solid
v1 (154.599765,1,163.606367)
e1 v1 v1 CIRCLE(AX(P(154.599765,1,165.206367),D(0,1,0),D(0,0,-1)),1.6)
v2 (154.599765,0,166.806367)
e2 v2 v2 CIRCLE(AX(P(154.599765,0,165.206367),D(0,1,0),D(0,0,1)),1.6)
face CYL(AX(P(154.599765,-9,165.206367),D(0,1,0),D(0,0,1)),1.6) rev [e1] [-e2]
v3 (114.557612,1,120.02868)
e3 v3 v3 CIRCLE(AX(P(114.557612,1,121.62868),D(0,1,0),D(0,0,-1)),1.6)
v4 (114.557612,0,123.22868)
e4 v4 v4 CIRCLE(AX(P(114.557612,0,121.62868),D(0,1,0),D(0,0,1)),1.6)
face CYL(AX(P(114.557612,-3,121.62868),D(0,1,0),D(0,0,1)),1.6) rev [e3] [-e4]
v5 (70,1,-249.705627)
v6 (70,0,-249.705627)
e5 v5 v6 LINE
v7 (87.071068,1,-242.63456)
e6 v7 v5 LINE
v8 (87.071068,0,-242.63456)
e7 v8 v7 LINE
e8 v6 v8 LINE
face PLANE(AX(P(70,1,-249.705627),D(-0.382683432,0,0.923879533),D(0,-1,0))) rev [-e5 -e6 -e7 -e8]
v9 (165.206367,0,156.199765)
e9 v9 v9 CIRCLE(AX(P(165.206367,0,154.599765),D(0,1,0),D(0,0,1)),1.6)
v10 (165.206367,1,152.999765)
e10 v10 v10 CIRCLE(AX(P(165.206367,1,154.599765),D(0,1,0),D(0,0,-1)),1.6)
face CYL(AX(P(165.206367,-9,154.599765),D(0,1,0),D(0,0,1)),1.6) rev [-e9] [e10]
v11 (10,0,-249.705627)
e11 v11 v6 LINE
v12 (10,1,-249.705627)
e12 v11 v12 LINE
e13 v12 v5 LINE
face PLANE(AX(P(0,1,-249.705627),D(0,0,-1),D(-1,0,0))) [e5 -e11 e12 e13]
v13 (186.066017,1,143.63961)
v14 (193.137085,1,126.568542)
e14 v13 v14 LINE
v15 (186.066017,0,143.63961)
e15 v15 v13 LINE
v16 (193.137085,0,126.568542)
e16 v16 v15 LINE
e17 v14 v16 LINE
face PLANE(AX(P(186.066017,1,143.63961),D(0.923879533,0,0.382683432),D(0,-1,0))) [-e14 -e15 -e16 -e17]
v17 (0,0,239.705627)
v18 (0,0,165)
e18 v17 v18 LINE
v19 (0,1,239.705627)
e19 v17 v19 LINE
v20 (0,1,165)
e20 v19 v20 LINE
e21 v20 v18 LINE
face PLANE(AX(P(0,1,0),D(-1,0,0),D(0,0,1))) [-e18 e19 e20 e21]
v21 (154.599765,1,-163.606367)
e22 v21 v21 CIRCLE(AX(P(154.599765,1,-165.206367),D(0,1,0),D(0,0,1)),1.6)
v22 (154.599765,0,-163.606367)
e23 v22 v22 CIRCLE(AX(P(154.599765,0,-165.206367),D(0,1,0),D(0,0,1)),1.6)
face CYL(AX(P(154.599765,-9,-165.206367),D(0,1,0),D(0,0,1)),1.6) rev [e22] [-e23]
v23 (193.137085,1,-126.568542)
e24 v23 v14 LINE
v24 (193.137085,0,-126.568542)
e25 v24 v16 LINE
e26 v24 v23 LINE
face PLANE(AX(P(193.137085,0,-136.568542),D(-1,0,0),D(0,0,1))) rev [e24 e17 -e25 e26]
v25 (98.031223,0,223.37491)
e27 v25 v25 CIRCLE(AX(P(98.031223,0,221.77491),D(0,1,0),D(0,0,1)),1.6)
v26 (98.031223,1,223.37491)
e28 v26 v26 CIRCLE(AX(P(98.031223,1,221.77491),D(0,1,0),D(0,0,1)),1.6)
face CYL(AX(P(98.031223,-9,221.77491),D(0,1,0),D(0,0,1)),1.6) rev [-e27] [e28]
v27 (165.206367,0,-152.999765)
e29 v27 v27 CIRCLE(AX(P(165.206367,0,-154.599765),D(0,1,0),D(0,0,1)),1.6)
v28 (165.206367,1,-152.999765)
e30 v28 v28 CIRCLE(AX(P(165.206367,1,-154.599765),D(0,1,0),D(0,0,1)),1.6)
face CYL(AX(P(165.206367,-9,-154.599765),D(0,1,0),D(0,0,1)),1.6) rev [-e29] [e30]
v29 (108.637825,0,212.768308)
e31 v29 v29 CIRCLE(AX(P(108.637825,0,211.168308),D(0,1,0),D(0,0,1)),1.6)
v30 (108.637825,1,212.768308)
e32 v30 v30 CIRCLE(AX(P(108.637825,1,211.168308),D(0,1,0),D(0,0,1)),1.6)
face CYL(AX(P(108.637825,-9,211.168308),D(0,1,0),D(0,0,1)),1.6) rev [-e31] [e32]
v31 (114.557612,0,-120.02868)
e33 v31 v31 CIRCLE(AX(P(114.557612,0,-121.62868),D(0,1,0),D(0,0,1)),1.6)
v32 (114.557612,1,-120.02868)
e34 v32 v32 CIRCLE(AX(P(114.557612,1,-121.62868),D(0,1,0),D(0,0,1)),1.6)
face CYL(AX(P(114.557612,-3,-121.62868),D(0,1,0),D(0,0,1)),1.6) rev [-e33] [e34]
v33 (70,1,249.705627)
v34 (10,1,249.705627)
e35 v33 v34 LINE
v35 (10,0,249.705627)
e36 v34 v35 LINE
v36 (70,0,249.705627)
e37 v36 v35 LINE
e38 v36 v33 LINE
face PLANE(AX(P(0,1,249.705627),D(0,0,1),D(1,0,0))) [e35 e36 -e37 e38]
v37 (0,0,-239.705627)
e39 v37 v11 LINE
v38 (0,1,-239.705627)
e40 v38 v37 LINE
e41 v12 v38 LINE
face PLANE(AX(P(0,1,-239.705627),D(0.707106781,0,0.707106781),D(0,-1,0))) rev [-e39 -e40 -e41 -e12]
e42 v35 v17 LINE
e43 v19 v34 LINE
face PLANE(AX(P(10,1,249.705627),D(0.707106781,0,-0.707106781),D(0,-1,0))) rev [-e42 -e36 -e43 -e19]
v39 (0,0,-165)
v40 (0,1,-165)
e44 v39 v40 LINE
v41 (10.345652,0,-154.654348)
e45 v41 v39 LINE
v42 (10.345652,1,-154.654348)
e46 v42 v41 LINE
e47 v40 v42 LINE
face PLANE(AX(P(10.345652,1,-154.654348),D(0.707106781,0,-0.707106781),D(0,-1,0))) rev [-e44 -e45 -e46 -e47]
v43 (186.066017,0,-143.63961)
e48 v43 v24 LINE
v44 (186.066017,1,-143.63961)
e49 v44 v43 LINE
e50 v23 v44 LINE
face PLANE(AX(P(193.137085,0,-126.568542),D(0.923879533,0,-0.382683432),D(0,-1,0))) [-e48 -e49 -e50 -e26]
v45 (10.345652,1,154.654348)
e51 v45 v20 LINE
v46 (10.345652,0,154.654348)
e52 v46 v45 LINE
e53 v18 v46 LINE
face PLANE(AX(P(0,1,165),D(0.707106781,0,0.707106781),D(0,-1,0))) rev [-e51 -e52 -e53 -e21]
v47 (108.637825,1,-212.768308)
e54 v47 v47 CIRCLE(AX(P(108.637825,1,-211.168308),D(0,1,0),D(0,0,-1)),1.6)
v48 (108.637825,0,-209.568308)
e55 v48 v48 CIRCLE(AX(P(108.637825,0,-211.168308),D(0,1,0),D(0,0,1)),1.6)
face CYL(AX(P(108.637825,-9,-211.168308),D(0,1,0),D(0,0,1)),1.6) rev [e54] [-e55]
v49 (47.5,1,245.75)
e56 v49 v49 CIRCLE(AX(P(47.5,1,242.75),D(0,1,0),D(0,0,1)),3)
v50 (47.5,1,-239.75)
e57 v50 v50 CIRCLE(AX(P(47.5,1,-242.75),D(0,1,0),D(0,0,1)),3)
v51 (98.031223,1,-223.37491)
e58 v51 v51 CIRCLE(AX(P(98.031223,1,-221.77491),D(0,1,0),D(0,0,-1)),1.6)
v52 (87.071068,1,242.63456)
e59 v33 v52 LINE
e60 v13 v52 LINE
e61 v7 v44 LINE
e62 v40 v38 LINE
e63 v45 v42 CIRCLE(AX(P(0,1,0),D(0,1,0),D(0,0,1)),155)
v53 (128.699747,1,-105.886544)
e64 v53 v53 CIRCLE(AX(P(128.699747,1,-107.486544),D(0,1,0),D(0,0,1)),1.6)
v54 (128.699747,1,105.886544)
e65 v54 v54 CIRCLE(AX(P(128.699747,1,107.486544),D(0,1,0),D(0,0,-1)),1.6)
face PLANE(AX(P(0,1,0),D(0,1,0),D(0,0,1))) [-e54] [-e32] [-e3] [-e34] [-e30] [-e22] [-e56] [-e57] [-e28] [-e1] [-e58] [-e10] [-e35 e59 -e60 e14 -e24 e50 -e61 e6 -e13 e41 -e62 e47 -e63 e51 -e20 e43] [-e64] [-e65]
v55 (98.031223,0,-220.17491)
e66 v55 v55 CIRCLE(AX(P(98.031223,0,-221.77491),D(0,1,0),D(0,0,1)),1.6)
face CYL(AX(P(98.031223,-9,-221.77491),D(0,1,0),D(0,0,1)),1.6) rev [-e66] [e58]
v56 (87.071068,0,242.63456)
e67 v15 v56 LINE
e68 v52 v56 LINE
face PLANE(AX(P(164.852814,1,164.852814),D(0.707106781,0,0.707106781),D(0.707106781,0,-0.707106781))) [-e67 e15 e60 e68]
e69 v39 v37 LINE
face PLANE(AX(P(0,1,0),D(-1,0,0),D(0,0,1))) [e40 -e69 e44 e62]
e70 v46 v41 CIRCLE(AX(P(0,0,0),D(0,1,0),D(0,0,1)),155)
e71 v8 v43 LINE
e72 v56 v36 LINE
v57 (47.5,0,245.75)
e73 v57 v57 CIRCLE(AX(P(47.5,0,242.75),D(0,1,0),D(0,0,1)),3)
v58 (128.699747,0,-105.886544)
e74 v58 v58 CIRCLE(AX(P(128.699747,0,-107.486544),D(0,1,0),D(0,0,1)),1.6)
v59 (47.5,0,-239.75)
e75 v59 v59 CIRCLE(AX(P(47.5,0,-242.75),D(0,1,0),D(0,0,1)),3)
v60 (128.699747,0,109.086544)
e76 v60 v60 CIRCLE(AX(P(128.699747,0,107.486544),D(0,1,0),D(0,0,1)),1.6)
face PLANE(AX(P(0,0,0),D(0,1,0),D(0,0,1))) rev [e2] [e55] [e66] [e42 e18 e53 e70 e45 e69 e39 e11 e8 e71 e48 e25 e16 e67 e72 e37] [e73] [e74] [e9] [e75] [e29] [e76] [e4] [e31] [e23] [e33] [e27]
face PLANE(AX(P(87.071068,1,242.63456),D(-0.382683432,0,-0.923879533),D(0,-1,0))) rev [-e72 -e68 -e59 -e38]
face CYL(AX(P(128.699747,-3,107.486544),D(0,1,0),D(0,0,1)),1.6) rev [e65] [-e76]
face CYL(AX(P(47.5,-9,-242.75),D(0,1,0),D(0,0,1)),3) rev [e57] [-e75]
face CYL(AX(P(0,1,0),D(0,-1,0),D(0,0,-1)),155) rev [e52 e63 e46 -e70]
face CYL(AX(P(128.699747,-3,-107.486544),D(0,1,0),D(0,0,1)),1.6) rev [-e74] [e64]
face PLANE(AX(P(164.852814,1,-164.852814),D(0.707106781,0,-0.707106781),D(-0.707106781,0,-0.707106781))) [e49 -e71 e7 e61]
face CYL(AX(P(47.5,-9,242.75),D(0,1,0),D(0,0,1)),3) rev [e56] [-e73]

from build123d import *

# Parameters (mm, degrees)
EXTRUDE_1_DEPTH     = 1
SKETCH_4_W          = 56.568542495
SKETCH_4_H          = 273.13708499
CUT_EXTRUDE_3_DEPTH = 354.138500868
CHAMFER_1_SIZE      = 10
SKETCH_5_R          = 1.6
CUT_EXTRUDE_4_DEPTH = 10
SKETCH_6_R          = 3
CUT_EXTRUDE_5_DEPTH = 10
SKETCH_7_R          = 1.6
CUT_EXTRUDE_6_DEPTH = 4


with BuildPart() as part:
    # 草图1 → 凸台-拉伸1 (new body)
    with BuildSketch(Plane(origin=(0, 0, 0), x_dir=(1, 0, 0), z_dir=(0, 1, 0))):
        with BuildLine():
            Line((0, 249.705627485), (0, 155))
            ThreePointArc((0, 155), (109.601551084, 109.601551084), (155, 0))
            ThreePointArc((155, 0), (109.601551084, -109.601551084), (0, -155))
            Line((0, -155), (0, -249.705627485))
            Line((0, -249.705627485), (80, -249.705627485))
            Line((80, -249.705627485), (249.705627485, -80))
            Line((249.705627485, -80), (249.705627485, 0))
            Line((249.705627485, 0), (249.705627485, 80))
            Line((249.705627485, 80), (80, 249.705627485))
            Line((80, 249.705627485), (0, 249.705627485))
        make_face()
    extrude(amount=EXTRUDE_1_DEPTH)

    # 草图4 → 切除-拉伸3 (cut, through all)
    with BuildSketch(Plane(origin=(0, 1, 0), x_dir=(1, 0, 0), z_dir=(0, 1, 0))):
        with Locations((221.421356237, 0)):
            Rectangle(SKETCH_4_W, SKETCH_4_H)
    extrude(amount=-CUT_EXTRUDE_3_DEPTH, mode=Mode.SUBTRACT)

    # 倒角1
    # the kernel refuses this chamfer: 10 mm, written as the material it takes off along each edge
    with BuildSketch(Plane(origin=(0, -26.617651024, -155), x_dir=(0.9994423420060535, 0, 0.0333916906648138), z_dir=(0, 1, 0))) as chamfer_1_piece_1:
        with BuildLine():
            Line((10.351424106, 0), (-CHAMFER_1_SIZE * 0.0333916906648, CHAMFER_1_SIZE * 0.999442342006))
            Line((-CHAMFER_1_SIZE * 0.0333916906648, CHAMFER_1_SIZE * 0.999442342006), (0, 0))
            ThreePointArc((0, 0), (5.321987279, 0.086367968), (10.351424106, 0))
        make_face()
    extrude(amount=54.235302047, mode=Mode.SUBTRACT)
    with BuildSketch(Plane(origin=(0, -25.71682988, -249.705627485), x_dir=(0, 0, 1), z_dir=(0, 1, 0))) as chamfer_1_piece_2:
        Polygon((CHAMFER_1_SIZE, 0), (0, CHAMFER_1_SIZE), (0, 0), align=None)
    extrude(amount=52.433659759, mode=Mode.SUBTRACT)
    with BuildSketch(Plane(origin=(80, -25.926703929, -249.705627485), x_dir=(-1, 0, 0), z_dir=(0, 1, 0)), Plane(origin=(193.13708499, 26.926703929, 136.568542495), x_dir=(-0.7071067811865447, 0, 0.7071067811865503), z_dir=(0, -1, 0))) as chamfer_1_piece_3:
        Polygon((CHAMFER_1_SIZE, 0), (-CHAMFER_1_SIZE * 0.707106781187, CHAMFER_1_SIZE * 0.707106781187), (0, 0), align=None)
    extrude(amount=52.853407858, mode=Mode.SUBTRACT)
    with BuildSketch(Plane(origin=(80, -25.926703929, 249.705627485), x_dir=(-1, 0, 0), z_dir=(0, 1, 0)), Plane(origin=(193.13708499, 26.926703929, -136.568542495), x_dir=(-0.7071067811865476, 0, -0.7071067811865476), z_dir=(0, -1, 0))) as chamfer_1_piece_4:
        Polygon((CHAMFER_1_SIZE, 0), (-CHAMFER_1_SIZE * 0.707106781187, -CHAMFER_1_SIZE * 0.707106781187), (0, 0), align=None)
    extrude(amount=52.853407858, mode=Mode.SUBTRACT)
    with BuildSketch(Plane(origin=(0, -25.71682988, 249.705627485), x_dir=(0, 0, -1), z_dir=(0, 1, 0))) as chamfer_1_piece_5:
        Polygon((CHAMFER_1_SIZE, 0), (0, -CHAMFER_1_SIZE), (0, 0), align=None)
    extrude(amount=52.433659759, mode=Mode.SUBTRACT)
    with BuildSketch(Plane(origin=(0, -26.617651024, 155), x_dir=(0, 0, 1), z_dir=(0, 1, 0))) as chamfer_1_piece_6:
        with BuildLine():
            Line((CHAMFER_1_SIZE, 0), (-0.345651552, 10.345651552))
            ThreePointArc((-0.345651552, 10.345651552), (-0.091390348, 5.321903403), (0, 0))
            Line((0, 0), (CHAMFER_1_SIZE, 0))
        make_face()
    extrude(amount=54.235302047, mode=Mode.SUBTRACT)

    # 草图5 → 切除-拉伸4 (cut)
    with BuildSketch(Plane(origin=(0, 1, 0), x_dir=(1, 0, 0), z_dir=(0, 1, 0))):
        with Locations(Location((98.03122292, -221.774909628, 0), (0, 0, 270))):
            Circle(SKETCH_5_R)
        with Locations(Location((108.637824638, -211.16830791, 0), (0, 0, 270))):
            Circle(SKETCH_5_R)
        with Locations(Location((154.599765415, -165.206367133, 0), (0, 0, 270))):
            Circle(SKETCH_5_R)
        with Locations(Location((165.206367133, -154.599765415, 0), (0, 0, 270))):
            Circle(SKETCH_5_R)
        with Locations(Location((165.206367133, 154.599765415, 0), (0, 0, 270))):
            Circle(SKETCH_5_R)
        with Locations(Location((154.599765415, 165.206367133, 0), (0, 0, 270))):
            Circle(SKETCH_5_R)
        with Locations(Location((108.637824638, 211.16830791, 0), (0, 0, 270))):
            Circle(SKETCH_5_R)
        with Locations(Location((98.03122292, 221.774909628, 0), (0, 0, 270))):
            Circle(SKETCH_5_R)
    extrude(amount=-CUT_EXTRUDE_4_DEPTH, mode=Mode.SUBTRACT)

    # 草图6 → 切除-拉伸5 (cut)
    with BuildSketch(Plane(origin=(0, 1, 0), x_dir=(1, 0, 0), z_dir=(0, 1, 0))):
        with Locations(Location((47.5, 242.75, 0), (0, 0, 270))):
            Circle(SKETCH_6_R)
        with Locations(Location((47.5, -242.75, 0), (0, 0, 270))):
            Circle(SKETCH_6_R)
    extrude(amount=-CUT_EXTRUDE_5_DEPTH, mode=Mode.SUBTRACT)

    # 草图7 → 切除-拉伸6 (cut)
    with BuildSketch(Plane(origin=(0, 1, 0), x_dir=(1, 0, 0), z_dir=(0, 1, 0))):
        with Locations(Location((114.557611845, 121.628679656, 0), (0, 0, 270))):
            Circle(SKETCH_7_R)
        with Locations(Location((128.699747468, 107.486544033, 0), (0, 0, 270))):
            Circle(SKETCH_7_R)
        with Locations(Location((128.699747468, -107.486544033, 0), (0, 0, 270))):
            Circle(SKETCH_7_R)
        with Locations(Location((114.557611845, -121.628679656, 0), (0, 0, 270))):
            Circle(SKETCH_7_R)
    extrude(amount=-CUT_EXTRUDE_6_DEPTH, mode=Mode.SUBTRACT)


solid = part.part
